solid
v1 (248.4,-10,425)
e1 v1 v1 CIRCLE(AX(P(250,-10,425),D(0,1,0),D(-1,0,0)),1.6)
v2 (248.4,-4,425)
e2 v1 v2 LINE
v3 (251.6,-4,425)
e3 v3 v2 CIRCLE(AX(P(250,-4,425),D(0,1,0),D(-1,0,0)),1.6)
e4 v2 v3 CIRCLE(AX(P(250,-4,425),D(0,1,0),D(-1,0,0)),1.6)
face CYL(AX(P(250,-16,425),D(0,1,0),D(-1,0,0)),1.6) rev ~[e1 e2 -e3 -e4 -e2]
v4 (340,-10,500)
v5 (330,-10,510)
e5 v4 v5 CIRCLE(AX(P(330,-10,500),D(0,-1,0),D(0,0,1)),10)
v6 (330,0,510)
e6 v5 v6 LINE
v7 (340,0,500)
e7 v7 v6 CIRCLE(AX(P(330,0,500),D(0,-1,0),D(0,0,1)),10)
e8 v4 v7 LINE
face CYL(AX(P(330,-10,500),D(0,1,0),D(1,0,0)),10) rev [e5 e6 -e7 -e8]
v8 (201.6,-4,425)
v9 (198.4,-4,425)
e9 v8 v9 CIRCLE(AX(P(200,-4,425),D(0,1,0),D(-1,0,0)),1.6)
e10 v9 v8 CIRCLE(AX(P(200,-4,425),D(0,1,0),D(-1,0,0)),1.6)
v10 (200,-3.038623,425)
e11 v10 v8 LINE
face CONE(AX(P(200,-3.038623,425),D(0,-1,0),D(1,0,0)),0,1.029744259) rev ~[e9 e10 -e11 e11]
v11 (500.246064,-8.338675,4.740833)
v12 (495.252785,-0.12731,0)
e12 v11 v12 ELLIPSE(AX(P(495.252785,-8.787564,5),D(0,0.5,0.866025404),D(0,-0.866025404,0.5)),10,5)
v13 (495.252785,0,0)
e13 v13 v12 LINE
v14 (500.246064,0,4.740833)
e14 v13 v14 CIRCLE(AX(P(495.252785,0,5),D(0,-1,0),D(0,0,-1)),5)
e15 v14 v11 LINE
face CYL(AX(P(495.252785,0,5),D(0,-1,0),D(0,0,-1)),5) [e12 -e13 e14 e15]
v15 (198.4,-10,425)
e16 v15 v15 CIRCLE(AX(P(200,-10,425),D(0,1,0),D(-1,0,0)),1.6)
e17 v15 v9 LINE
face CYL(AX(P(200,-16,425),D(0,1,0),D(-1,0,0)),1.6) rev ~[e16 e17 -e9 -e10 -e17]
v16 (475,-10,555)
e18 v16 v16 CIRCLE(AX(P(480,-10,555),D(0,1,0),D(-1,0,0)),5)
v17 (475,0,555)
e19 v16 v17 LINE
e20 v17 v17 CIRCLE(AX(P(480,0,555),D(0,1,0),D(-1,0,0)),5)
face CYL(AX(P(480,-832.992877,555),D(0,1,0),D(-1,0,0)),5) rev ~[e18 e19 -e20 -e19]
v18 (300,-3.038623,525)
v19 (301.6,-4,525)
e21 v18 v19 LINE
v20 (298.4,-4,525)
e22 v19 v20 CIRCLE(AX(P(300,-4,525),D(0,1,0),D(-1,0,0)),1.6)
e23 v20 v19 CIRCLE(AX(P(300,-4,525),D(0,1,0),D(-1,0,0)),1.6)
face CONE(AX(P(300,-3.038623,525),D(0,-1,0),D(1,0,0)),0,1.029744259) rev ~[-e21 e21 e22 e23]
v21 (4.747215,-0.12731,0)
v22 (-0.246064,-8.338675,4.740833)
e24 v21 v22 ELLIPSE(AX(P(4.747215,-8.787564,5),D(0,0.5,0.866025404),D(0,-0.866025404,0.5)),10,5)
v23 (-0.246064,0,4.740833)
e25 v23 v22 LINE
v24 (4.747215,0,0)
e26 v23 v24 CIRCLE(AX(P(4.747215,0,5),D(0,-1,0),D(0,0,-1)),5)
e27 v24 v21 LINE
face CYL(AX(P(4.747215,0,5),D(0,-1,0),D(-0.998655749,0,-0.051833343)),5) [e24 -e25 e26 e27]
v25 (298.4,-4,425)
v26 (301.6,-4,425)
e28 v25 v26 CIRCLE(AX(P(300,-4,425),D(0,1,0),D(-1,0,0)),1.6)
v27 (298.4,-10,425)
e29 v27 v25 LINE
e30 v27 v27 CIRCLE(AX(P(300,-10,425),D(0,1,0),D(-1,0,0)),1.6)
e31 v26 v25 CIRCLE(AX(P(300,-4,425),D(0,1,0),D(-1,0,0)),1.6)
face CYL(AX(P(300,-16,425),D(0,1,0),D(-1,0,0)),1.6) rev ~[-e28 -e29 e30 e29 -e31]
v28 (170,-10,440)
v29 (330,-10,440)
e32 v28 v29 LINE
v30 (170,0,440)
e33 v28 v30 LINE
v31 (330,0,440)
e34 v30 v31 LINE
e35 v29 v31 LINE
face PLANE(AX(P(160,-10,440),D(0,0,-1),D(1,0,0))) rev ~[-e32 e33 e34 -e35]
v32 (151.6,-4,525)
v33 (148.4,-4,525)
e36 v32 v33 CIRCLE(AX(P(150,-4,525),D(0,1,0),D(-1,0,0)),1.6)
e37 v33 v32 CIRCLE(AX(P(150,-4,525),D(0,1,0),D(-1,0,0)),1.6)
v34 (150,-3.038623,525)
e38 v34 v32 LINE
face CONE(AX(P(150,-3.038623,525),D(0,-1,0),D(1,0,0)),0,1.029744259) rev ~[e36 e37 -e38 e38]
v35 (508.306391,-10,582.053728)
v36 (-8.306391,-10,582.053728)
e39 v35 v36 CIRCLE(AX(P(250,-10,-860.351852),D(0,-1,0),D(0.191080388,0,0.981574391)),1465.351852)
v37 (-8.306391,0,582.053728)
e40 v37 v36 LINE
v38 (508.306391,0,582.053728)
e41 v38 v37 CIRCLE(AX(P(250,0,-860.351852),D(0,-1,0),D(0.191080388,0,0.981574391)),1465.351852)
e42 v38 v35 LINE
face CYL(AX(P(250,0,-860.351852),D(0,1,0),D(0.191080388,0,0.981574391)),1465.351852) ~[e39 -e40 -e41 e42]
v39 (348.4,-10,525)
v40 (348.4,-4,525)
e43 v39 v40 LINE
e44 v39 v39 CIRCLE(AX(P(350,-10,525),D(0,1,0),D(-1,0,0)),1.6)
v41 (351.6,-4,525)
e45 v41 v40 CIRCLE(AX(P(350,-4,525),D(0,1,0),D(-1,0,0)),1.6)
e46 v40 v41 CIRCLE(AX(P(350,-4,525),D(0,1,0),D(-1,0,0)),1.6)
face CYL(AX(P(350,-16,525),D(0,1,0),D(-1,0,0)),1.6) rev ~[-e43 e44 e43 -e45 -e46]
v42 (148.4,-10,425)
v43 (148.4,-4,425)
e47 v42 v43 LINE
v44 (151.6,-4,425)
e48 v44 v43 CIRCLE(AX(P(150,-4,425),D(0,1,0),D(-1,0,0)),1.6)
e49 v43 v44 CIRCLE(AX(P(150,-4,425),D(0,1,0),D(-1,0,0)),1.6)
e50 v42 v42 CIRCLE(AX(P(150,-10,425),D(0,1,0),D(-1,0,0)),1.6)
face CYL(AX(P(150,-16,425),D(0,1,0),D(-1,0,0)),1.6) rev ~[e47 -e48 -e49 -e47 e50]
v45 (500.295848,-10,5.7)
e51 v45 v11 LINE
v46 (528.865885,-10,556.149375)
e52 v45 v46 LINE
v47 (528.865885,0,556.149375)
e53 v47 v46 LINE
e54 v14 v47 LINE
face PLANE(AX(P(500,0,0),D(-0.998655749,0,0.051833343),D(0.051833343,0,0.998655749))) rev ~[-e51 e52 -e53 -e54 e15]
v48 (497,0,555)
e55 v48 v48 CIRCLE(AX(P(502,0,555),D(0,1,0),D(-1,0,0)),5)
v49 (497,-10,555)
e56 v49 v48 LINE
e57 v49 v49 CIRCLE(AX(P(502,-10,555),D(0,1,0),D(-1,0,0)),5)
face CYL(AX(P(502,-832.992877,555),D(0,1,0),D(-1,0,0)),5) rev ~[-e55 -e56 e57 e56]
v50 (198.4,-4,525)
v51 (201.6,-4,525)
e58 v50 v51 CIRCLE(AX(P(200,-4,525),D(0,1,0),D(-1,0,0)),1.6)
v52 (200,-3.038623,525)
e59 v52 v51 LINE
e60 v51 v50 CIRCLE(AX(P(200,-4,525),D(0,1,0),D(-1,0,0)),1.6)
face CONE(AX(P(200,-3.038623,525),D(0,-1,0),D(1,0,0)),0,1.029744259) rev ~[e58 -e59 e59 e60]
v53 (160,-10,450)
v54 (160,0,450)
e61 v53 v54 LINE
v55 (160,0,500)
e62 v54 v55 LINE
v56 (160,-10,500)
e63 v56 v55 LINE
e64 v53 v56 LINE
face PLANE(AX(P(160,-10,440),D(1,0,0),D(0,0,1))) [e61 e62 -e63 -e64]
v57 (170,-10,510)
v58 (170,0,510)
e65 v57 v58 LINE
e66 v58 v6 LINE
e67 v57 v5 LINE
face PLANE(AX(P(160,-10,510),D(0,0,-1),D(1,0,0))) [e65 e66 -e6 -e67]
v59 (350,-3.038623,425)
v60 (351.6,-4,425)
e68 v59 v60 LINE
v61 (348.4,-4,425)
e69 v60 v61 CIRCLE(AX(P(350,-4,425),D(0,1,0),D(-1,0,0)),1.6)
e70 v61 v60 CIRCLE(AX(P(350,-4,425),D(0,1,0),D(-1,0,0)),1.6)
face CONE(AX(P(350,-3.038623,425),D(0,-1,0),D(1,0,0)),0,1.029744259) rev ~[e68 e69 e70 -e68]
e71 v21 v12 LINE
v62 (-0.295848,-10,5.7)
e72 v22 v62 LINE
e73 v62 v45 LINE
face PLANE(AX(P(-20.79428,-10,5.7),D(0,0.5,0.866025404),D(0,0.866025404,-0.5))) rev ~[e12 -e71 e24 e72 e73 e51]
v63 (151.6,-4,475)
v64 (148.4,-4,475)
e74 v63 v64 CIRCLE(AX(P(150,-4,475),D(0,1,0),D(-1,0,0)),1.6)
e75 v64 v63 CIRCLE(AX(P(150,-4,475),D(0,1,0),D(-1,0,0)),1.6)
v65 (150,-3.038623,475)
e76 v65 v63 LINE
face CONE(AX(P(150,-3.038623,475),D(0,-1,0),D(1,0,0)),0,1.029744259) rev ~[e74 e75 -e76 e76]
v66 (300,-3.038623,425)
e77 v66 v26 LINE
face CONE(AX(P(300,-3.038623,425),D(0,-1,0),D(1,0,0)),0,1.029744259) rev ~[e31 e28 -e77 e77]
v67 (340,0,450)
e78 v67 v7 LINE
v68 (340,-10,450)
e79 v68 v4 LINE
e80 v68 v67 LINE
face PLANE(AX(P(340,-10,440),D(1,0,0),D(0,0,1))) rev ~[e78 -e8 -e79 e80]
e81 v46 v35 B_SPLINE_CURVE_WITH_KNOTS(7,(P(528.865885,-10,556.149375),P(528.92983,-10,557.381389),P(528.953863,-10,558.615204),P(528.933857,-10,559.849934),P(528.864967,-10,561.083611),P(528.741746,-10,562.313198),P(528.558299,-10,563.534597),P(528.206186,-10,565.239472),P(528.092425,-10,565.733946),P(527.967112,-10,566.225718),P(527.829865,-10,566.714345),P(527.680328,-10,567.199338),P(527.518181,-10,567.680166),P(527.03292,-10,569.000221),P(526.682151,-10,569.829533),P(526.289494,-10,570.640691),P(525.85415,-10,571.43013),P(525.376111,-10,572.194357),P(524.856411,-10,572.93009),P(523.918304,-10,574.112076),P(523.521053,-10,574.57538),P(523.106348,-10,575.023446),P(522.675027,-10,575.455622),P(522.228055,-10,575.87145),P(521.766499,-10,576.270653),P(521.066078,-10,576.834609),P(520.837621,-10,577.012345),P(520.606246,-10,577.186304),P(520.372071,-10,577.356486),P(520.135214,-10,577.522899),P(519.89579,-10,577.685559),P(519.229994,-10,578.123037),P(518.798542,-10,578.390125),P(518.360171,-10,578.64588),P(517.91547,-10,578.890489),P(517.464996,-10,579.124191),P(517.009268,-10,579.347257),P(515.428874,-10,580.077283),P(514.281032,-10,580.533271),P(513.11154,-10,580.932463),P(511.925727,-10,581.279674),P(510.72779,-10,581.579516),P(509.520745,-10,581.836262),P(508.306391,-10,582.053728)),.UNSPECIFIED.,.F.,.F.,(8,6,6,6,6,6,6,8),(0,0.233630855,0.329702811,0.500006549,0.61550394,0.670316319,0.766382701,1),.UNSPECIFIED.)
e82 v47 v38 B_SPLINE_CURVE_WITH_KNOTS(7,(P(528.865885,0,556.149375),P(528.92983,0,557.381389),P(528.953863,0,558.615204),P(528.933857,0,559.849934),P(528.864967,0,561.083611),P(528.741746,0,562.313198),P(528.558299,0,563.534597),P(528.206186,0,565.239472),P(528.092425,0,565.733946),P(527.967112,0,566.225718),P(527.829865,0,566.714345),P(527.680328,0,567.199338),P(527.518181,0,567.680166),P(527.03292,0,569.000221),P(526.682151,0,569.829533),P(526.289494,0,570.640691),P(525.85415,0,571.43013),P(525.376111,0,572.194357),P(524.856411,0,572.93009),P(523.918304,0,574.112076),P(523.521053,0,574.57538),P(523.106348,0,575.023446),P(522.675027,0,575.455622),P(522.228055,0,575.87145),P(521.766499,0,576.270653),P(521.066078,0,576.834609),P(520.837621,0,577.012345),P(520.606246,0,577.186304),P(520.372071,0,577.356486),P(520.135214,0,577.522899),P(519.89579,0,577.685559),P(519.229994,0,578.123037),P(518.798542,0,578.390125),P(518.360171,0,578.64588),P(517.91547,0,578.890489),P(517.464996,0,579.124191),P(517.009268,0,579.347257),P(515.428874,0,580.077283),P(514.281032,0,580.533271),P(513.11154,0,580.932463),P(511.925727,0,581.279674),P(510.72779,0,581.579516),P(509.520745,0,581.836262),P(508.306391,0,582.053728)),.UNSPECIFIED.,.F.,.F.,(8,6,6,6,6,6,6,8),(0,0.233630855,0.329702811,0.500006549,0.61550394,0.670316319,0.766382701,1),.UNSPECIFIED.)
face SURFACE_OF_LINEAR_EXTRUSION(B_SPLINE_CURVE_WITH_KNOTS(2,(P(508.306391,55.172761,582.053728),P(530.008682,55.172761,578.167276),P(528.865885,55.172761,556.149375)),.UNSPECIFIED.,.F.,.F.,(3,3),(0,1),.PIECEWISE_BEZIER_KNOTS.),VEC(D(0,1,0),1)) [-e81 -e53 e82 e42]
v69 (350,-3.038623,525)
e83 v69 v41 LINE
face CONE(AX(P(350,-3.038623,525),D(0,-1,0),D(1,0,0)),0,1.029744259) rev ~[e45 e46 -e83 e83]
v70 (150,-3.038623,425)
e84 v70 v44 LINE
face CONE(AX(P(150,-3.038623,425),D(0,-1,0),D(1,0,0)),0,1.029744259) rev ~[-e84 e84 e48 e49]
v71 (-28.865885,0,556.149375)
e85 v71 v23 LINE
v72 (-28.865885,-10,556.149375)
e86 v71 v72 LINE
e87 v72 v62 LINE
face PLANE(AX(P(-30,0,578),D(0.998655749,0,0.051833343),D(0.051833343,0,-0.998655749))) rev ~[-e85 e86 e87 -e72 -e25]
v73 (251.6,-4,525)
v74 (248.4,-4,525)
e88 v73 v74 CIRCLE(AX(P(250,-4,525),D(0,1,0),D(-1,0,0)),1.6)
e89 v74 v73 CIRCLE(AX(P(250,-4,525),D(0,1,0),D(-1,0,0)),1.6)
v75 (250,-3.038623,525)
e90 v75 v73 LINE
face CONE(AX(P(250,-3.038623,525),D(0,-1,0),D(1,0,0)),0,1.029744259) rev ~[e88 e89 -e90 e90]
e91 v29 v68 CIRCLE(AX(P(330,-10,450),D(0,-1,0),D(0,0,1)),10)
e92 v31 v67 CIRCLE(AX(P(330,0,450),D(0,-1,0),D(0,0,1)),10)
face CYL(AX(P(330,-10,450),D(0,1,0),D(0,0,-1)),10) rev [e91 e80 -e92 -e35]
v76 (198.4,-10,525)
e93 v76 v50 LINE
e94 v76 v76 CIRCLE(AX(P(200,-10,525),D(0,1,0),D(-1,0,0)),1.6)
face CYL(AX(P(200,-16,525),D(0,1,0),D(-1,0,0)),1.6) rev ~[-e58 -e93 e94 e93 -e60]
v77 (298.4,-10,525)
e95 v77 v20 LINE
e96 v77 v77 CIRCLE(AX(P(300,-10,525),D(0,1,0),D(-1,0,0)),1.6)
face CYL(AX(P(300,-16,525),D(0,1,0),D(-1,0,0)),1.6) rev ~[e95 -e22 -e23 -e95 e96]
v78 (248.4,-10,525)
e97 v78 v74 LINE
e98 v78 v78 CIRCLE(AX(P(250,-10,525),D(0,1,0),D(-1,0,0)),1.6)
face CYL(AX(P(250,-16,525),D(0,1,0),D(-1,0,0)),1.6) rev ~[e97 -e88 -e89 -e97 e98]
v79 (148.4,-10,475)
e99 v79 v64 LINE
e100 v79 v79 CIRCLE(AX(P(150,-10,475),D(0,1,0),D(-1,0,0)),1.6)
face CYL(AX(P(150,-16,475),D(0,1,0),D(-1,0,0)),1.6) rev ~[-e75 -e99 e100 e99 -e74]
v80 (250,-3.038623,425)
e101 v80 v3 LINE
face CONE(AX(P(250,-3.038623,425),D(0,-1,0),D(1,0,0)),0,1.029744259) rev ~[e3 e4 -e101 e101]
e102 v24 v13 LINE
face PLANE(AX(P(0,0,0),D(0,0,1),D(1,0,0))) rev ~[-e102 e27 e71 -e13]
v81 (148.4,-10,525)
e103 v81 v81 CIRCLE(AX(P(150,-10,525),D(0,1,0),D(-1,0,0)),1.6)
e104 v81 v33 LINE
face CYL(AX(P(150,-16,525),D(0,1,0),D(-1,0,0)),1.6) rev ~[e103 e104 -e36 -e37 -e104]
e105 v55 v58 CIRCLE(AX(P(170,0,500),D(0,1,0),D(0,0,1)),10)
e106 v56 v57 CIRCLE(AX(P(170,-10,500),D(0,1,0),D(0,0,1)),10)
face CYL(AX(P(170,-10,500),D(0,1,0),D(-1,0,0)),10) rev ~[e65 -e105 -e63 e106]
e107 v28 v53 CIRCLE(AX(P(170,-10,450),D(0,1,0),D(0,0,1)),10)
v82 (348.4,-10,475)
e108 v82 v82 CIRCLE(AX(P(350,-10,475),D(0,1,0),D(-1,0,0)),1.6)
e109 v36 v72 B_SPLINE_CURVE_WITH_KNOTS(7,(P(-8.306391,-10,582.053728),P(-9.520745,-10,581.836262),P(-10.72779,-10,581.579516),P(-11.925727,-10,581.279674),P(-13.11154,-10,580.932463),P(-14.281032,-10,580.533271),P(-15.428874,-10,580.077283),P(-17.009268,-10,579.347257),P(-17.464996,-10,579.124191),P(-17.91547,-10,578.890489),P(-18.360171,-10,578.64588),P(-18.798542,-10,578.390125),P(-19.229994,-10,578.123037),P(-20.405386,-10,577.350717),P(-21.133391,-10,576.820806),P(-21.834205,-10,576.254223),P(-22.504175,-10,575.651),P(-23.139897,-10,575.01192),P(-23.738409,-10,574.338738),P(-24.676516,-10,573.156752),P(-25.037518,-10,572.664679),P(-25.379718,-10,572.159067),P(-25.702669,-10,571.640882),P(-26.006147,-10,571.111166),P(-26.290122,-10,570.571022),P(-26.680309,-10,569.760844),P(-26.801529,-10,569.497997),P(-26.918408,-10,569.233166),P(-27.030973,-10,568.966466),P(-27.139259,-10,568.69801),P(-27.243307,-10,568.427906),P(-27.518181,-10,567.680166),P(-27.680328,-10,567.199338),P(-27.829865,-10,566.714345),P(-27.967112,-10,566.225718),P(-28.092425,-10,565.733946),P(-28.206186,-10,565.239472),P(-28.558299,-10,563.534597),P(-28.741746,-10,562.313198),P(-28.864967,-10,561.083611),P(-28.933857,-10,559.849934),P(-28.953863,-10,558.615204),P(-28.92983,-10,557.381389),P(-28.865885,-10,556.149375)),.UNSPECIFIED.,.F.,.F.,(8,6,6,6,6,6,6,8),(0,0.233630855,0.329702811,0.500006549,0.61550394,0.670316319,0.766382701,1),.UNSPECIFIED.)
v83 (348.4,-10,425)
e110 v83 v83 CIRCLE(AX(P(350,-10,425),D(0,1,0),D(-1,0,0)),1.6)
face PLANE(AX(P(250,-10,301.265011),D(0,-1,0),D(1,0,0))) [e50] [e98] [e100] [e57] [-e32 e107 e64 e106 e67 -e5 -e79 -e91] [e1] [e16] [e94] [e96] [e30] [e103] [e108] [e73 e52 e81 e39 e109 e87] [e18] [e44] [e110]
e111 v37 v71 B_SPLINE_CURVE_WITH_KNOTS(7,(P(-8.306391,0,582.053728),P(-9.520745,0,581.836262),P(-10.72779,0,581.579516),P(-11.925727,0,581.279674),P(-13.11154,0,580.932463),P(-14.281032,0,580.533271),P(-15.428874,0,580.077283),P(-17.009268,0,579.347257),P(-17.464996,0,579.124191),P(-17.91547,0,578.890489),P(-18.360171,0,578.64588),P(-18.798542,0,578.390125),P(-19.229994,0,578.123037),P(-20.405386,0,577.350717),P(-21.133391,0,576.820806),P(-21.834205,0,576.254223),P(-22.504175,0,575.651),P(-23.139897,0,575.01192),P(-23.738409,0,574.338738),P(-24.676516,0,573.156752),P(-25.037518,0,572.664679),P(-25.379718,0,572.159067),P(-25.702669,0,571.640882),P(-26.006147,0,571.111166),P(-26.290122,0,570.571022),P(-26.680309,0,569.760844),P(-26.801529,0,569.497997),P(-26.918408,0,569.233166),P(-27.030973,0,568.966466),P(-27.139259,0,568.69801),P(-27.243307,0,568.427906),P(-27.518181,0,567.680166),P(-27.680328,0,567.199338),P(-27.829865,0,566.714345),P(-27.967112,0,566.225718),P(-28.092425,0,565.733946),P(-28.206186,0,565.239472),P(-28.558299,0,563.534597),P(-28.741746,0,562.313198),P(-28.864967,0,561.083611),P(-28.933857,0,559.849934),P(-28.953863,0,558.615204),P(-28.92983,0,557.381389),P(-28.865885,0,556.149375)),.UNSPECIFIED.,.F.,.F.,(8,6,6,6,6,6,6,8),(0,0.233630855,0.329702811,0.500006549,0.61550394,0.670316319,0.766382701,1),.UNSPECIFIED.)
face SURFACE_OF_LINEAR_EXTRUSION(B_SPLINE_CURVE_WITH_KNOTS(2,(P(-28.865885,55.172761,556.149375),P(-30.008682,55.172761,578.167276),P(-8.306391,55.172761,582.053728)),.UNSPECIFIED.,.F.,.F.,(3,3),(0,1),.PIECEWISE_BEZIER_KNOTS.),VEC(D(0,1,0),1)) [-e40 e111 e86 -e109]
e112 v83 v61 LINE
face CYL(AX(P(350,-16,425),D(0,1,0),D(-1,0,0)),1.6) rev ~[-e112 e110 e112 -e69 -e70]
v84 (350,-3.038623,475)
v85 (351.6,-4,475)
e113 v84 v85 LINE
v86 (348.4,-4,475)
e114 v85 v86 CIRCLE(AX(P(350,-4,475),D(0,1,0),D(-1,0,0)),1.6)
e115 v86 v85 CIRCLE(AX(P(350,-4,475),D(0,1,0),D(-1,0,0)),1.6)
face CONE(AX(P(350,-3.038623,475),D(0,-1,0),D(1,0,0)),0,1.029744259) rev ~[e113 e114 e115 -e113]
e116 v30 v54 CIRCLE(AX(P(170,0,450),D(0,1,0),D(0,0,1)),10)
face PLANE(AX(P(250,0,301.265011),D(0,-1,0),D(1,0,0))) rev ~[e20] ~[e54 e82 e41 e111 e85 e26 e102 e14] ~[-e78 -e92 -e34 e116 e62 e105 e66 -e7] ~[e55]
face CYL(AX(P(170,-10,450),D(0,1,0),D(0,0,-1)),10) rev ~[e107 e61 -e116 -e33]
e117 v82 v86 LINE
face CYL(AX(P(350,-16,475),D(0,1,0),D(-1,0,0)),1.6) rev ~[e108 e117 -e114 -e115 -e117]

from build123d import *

# Parameters (mm, degrees)
F1_DEPTH    = 10
F2_W        = 180
F2_H        = 70
F3_DEPTH    = 10.001
F4_T1_DEPTH = 120.3455223822
F5_R        = 5
F6_T1_DEPTH = 541.5885597996
F7_R        = 10
F9_D        = 3.2
F9_DEPTH    = 6
F9_TIP      = 0.9613769904
F11_D       = 10


# Not quite as in the source:
# - a fillet or chamfer that OpenCascade refuses, or shapes differently, is made with other operations: its cross-section is extruded or revolved along the edge and cut away or added


with BuildPart() as f1:
    # F0 (on Front) → F1 (new body)
    with BuildSketch(Plane.XZ):
        with BuildLine():
            Line((-30, 578), (0, 0))
            Line((0, 0), (500, 0))
            Line((500, 0), (530, 578))
            ThreePointArc((530, 578), (250, 605), (-30, 578))
        make_face()
    extrude(amount=F1_DEPTH)

    # F2 (on face) → F3 (cut, through all)
    with BuildSketch(Plane.XZ.offset(10)):
        with Locations((250, 475)):
            Rectangle(F2_W, F2_H)
    extrude(amount=-F3_DEPTH, mode=Mode.SUBTRACT)

    # F4: fillet of radius 25 on 2 edges, made by hand

    # F4_s2 → F4_t1 (cut)
    with BuildSketch(Plane.XZ.offset(-55.1727611911)):
        with BuildLine():
            add(Edge.make_bspline(
                [(-28.865884536, 556.1493753933), (-30.0086821523, 578.1672761351), (-8.3063912994, 582.0537283993)],
                knots=[0, 0, 0, 1, 1, 1], degree=2, weights=[1, 1, 1]))
            ThreePointArc((-8.3063912994, 582.0537283993), (-19.1608272147, 580.0677046728), (-30, 578))
            Line((-30, 578), (-28.865884536, 556.1493753933))
        make_face()
        with BuildLine():
            add(Edge.make_bspline(
                [(508.3063912994, 582.0537283993), (530.0086821523, 578.1672761351), (528.865884536, 556.1493753933)],
                knots=[0, 0, 0, 1, 1, 1], degree=2, weights=[1, 1, 1]))
            Line((528.865884536, 556.1493753933), (530, 578))
            ThreePointArc((530, 578), (519.1608272147, 580.0677046728), (508.3063912994, 582.0537283993))
        make_face()
    extrude(amount=F4_T1_DEPTH, mode=Mode.SUBTRACT)

    # F5
    f5_edges = [f1.edges().sort_by_distance(p)[0] for p in [
        (500, -5, 0),
        (0, -5, 0),
    ]]
    fillet(f5_edges, radius=F5_R)

    # F6: chamfer of 5.7 x 9.8726896031 on 1 edges, made by hand

    # F6_s2 → F6_t1 (cut)
    with BuildSketch(Plane.YZ.offset(-20.7942798998)):
        Polygon((-10, 5.7), (-0.1273103969, 0), (-10, 0), align=None)
    extrude(amount=F6_T1_DEPTH, mode=Mode.SUBTRACT)

    # F7
    f7_edges = [f1.edges().sort_by_distance(p)[0] for p in [
        (340, -5, 510),
        (160, -5, 510),
        (160, -5, 440),
        (340, -5, 440),
    ]]
    fillet(f7_edges, radius=F7_R)

    # F9
    with Locations(Plane.XZ.offset(10)):
        with Locations((150, 525), (200, 525), (250, 525), (250, 425), (200, 425), (150, 425), (150, 475), (350, 525), (350, 475), (350, 425), (300, 425), (300, 525)):
            Hole(F9_D / 2, depth=F9_DEPTH)
            with Locations((0, 0, -(F9_DEPTH + F9_TIP / 2))):  # 118° drill point
                Cone(0, F9_D / 2, F9_TIP, mode=Mode.SUBTRACT)

    # F11 (through all)
    with Locations(Plane.XZ.offset(10)):
        with Locations((480, 555), (502, 555)):
            Hole(F11_D / 2)


solid = f1.part
